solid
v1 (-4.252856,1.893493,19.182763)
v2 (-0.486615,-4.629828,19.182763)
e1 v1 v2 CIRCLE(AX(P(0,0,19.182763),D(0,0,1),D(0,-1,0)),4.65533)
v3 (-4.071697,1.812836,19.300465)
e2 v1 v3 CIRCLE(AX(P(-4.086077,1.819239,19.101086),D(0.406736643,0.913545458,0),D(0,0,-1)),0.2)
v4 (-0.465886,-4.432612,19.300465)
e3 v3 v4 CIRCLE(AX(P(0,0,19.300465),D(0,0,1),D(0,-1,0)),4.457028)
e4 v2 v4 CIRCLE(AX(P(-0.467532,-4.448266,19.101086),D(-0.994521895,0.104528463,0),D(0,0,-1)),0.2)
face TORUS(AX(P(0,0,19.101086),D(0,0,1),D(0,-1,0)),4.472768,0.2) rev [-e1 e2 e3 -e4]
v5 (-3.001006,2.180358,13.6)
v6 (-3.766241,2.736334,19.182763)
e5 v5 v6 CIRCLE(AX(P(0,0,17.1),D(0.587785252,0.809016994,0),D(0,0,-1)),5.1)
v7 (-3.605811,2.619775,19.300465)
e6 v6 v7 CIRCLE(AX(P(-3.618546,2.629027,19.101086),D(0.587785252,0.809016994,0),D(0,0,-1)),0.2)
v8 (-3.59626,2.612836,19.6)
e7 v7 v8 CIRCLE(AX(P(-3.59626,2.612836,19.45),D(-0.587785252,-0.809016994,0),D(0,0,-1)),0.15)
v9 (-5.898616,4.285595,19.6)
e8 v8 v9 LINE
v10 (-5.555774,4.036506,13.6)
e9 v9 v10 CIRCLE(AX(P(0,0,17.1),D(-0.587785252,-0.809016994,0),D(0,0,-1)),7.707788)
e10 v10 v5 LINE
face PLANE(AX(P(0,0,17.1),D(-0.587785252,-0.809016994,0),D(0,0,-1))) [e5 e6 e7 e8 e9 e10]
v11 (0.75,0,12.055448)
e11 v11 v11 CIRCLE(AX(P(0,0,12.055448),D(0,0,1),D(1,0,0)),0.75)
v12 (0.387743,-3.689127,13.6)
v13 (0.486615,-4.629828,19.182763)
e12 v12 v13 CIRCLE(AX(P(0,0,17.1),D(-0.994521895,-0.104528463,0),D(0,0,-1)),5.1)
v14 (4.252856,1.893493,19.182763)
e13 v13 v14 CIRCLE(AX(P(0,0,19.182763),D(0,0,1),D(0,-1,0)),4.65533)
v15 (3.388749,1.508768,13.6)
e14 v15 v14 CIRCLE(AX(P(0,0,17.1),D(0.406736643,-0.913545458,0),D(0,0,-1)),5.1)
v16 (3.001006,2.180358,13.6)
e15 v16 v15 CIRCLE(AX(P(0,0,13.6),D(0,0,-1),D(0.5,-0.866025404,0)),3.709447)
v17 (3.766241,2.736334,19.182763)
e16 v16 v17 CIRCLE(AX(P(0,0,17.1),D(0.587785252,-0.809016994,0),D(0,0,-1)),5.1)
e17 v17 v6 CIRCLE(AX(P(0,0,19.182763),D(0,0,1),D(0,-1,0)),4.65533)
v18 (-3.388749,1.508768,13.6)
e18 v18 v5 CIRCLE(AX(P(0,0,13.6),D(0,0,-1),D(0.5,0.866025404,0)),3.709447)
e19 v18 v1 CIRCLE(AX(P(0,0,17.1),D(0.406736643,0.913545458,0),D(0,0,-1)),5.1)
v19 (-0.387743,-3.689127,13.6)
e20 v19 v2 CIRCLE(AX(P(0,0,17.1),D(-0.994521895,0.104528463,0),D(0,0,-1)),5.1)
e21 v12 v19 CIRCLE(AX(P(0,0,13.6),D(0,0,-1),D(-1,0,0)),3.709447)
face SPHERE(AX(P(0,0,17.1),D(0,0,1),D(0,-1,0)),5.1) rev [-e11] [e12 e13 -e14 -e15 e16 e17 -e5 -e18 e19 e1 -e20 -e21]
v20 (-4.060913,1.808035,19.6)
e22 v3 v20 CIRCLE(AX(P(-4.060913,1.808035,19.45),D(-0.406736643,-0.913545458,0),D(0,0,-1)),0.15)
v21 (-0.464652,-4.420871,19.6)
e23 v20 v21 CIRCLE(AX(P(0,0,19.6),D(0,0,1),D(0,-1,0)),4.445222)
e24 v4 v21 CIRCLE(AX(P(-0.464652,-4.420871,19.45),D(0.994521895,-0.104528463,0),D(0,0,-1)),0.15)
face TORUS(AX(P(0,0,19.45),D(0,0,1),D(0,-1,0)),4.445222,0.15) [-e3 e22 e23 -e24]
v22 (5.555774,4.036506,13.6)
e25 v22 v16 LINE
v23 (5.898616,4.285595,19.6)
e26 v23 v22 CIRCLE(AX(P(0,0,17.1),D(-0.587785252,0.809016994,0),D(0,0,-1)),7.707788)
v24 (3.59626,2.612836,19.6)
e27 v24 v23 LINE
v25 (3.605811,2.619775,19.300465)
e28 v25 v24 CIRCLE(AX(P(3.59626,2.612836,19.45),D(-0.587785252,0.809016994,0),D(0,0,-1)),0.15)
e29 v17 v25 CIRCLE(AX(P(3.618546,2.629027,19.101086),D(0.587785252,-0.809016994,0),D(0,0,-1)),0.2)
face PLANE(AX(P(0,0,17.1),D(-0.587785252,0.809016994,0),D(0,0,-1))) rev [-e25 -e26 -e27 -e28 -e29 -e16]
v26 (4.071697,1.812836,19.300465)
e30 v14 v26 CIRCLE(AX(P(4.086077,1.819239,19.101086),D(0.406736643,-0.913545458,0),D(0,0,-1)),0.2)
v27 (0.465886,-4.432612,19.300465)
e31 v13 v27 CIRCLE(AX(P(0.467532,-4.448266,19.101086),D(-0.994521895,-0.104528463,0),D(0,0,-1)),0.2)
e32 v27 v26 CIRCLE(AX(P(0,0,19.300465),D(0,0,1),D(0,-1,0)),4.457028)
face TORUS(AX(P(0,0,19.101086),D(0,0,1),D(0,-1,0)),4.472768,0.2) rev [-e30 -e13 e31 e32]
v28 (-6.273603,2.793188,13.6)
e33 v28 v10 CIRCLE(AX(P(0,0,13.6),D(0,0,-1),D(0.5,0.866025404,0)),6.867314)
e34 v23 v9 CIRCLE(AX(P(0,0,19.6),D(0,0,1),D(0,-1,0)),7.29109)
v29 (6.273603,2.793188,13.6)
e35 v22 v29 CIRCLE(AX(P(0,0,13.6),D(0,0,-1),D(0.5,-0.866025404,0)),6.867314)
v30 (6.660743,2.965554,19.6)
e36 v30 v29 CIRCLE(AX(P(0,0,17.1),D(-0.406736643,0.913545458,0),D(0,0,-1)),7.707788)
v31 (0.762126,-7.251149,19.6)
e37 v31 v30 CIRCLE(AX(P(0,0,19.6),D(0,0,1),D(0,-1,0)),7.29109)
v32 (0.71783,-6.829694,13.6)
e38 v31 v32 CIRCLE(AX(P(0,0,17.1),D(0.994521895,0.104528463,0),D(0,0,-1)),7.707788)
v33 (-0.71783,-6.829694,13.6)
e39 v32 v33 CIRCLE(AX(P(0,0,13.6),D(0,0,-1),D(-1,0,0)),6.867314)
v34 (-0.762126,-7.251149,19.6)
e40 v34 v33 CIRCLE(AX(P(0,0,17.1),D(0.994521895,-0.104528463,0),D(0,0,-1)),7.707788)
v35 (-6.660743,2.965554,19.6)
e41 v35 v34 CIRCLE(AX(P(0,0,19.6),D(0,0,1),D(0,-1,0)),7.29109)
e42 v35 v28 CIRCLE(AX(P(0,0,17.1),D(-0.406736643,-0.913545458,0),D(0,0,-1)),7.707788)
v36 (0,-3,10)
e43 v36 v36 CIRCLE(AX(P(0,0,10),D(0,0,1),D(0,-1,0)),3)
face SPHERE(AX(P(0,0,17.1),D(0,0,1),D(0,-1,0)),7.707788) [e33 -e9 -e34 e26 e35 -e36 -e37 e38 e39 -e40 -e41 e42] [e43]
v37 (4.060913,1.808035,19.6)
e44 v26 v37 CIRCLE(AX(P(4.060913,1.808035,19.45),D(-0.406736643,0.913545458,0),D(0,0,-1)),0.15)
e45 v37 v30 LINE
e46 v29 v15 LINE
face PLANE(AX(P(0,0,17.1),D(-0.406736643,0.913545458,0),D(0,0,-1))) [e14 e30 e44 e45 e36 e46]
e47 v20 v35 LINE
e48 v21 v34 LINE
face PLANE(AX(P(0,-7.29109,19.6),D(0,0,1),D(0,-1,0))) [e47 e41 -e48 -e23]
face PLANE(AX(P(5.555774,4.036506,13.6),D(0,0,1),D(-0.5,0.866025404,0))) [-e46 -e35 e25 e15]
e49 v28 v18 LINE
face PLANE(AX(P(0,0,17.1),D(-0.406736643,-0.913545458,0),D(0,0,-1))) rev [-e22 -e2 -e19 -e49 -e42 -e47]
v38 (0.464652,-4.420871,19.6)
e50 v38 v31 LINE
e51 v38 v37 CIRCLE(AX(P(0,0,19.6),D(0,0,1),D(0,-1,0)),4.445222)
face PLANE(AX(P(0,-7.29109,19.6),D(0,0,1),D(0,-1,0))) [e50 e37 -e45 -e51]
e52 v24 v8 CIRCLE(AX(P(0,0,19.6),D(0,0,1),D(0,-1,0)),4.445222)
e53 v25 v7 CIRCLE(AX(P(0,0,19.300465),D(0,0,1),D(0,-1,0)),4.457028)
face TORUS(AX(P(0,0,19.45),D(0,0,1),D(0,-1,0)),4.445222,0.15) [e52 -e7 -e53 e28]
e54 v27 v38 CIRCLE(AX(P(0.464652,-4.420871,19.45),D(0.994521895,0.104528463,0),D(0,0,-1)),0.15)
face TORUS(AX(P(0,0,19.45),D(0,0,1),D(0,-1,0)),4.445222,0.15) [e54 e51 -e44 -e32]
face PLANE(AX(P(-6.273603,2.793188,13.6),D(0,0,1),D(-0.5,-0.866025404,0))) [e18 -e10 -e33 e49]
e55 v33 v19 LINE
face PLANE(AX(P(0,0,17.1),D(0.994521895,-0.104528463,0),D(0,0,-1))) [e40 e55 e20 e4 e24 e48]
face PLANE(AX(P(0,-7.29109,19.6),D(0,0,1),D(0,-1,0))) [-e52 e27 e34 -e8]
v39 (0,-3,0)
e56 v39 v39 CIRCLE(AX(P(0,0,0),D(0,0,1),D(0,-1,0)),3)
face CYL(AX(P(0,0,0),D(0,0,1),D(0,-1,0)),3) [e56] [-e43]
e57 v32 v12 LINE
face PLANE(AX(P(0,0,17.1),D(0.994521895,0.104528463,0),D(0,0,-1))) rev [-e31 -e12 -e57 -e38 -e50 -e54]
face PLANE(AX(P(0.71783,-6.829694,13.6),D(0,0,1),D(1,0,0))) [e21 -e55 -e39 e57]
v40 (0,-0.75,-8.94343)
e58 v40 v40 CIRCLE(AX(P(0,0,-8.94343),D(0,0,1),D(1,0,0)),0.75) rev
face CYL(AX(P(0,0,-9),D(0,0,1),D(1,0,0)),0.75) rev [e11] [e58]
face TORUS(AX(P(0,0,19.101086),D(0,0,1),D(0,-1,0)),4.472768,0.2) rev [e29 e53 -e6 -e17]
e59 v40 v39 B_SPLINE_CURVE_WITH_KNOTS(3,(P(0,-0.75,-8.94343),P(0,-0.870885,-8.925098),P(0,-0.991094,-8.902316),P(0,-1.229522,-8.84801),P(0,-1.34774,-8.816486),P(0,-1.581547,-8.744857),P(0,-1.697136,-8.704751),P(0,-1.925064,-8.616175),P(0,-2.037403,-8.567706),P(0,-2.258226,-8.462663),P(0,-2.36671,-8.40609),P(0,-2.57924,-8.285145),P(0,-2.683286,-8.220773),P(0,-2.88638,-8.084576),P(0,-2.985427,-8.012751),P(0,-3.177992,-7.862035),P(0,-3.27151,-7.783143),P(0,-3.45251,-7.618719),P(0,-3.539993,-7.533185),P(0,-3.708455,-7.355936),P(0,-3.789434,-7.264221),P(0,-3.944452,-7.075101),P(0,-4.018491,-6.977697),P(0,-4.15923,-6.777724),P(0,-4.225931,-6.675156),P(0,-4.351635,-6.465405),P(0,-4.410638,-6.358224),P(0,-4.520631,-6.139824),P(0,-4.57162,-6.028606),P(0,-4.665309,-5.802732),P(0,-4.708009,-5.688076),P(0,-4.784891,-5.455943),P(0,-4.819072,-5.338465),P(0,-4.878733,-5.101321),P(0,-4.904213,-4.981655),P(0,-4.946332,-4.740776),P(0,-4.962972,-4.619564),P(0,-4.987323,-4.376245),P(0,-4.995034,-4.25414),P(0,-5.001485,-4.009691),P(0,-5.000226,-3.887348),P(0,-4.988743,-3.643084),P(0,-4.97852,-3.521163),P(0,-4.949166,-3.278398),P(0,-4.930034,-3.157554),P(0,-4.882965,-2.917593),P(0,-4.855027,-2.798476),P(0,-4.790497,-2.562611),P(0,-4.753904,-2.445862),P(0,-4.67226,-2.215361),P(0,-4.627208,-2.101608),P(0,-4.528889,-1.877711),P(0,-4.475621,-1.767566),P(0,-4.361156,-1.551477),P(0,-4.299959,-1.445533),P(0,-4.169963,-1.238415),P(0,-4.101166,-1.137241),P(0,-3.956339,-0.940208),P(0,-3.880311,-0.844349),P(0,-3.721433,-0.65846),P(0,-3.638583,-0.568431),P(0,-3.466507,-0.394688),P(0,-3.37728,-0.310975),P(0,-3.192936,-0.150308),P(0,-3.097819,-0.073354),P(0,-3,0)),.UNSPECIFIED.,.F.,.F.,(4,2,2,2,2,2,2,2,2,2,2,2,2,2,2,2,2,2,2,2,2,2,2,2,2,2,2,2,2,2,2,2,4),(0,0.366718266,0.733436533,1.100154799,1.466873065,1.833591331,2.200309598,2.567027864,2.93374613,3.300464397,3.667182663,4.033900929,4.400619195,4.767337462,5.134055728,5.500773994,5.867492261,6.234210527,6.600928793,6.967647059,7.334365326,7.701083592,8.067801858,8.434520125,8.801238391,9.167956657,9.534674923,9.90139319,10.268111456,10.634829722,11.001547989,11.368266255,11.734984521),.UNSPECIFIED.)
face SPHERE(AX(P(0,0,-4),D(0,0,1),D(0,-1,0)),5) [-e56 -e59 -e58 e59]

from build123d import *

# Parameters (mm, degrees)
CORTAR_REVOLUCI_N1_START = 13.6
CORTAR_REVOLUCI_N1_DEPTH = 6
MATRIZC1_COUNT           = 3
CROQUIS4_R               = 0.75
CORTAR_EXTRUIR1_DEPTH    = 31.606861976


# Read off the part's stored shape, not the designer's step: Cortar-Revolución1
with BuildPart() as part:
    # Croquis1 → Revolución1 (revolve)
    with BuildSketch(Plane.YZ):
        with BuildLine():
            Line((0, 0), (0, -9))
            ThreePointArc((0, -9), (-4.74341649, -5.58113883), (-3, 0))
            Line((-3, 0), (-3, 10))
            ThreePointArc((-3, 10), (-7.036805787, 13.954628111), (-7.291090453, 19.6))
            Line((-7.291090453, 19.6), (-4.445222154, 19.6))
            ThreePointArc((-4.445222154, 19.6), (-4.295338521, 19.444092675), (-4.45702764, 19.300465287))
            ThreePointArc((-4.45702764, 19.300465287), (-4.57485069, 19.273071665), (-4.655330258, 19.182762635))
            ThreePointArc((-4.655330258, 19.182762635), (-4.279724841, 14.326202011), (0, 12))
            Line((0, 12), (0, 0))
        make_face()
    revolve(axis=Axis((0, 0, 0), (0, 0, -1)))

    # Cortar-Revolución1 outline → Cortar-Revolución1 (cut)
    with BuildSketch(Plane.XY.offset(CORTAR_REVOLUCI_N1_START)):
        Polygon((0.945938118, -9), (0.805683263, -7.665564198), (0.387742836, -3.689126657), (0.21020847, -2), (-0.21020847, -2), (-0.387742836, -3.689126657), (-0.805683263, -7.665564198), (-0.945938118, -9), align=None)
    cortar_revoluci_n1 = extrude(amount=CORTAR_REVOLUCI_N1_DEPTH, mode=Mode.SUBTRACT)

    # MatrizC1: Cortar-Revolución1 ×3 about axis
    matrizc1_axis = Axis((0, 0, 0), (0, 0, 1))
    for i in range(1, MATRIZC1_COUNT):
        add(cortar_revoluci_n1.rotate(matrizc1_axis, i * 360 / MATRIZC1_COUNT), mode=Mode.SUBTRACT)

    # Croquis4 → Cortar-Extruir1 (cut, through all)
    with BuildSketch(Plane.XY.offset(19.6)):
        Circle(CROQUIS4_R)
    extrude(amount=-CORTAR_EXTRUIR1_DEPTH, mode=Mode.SUBTRACT)


solid = part.part
